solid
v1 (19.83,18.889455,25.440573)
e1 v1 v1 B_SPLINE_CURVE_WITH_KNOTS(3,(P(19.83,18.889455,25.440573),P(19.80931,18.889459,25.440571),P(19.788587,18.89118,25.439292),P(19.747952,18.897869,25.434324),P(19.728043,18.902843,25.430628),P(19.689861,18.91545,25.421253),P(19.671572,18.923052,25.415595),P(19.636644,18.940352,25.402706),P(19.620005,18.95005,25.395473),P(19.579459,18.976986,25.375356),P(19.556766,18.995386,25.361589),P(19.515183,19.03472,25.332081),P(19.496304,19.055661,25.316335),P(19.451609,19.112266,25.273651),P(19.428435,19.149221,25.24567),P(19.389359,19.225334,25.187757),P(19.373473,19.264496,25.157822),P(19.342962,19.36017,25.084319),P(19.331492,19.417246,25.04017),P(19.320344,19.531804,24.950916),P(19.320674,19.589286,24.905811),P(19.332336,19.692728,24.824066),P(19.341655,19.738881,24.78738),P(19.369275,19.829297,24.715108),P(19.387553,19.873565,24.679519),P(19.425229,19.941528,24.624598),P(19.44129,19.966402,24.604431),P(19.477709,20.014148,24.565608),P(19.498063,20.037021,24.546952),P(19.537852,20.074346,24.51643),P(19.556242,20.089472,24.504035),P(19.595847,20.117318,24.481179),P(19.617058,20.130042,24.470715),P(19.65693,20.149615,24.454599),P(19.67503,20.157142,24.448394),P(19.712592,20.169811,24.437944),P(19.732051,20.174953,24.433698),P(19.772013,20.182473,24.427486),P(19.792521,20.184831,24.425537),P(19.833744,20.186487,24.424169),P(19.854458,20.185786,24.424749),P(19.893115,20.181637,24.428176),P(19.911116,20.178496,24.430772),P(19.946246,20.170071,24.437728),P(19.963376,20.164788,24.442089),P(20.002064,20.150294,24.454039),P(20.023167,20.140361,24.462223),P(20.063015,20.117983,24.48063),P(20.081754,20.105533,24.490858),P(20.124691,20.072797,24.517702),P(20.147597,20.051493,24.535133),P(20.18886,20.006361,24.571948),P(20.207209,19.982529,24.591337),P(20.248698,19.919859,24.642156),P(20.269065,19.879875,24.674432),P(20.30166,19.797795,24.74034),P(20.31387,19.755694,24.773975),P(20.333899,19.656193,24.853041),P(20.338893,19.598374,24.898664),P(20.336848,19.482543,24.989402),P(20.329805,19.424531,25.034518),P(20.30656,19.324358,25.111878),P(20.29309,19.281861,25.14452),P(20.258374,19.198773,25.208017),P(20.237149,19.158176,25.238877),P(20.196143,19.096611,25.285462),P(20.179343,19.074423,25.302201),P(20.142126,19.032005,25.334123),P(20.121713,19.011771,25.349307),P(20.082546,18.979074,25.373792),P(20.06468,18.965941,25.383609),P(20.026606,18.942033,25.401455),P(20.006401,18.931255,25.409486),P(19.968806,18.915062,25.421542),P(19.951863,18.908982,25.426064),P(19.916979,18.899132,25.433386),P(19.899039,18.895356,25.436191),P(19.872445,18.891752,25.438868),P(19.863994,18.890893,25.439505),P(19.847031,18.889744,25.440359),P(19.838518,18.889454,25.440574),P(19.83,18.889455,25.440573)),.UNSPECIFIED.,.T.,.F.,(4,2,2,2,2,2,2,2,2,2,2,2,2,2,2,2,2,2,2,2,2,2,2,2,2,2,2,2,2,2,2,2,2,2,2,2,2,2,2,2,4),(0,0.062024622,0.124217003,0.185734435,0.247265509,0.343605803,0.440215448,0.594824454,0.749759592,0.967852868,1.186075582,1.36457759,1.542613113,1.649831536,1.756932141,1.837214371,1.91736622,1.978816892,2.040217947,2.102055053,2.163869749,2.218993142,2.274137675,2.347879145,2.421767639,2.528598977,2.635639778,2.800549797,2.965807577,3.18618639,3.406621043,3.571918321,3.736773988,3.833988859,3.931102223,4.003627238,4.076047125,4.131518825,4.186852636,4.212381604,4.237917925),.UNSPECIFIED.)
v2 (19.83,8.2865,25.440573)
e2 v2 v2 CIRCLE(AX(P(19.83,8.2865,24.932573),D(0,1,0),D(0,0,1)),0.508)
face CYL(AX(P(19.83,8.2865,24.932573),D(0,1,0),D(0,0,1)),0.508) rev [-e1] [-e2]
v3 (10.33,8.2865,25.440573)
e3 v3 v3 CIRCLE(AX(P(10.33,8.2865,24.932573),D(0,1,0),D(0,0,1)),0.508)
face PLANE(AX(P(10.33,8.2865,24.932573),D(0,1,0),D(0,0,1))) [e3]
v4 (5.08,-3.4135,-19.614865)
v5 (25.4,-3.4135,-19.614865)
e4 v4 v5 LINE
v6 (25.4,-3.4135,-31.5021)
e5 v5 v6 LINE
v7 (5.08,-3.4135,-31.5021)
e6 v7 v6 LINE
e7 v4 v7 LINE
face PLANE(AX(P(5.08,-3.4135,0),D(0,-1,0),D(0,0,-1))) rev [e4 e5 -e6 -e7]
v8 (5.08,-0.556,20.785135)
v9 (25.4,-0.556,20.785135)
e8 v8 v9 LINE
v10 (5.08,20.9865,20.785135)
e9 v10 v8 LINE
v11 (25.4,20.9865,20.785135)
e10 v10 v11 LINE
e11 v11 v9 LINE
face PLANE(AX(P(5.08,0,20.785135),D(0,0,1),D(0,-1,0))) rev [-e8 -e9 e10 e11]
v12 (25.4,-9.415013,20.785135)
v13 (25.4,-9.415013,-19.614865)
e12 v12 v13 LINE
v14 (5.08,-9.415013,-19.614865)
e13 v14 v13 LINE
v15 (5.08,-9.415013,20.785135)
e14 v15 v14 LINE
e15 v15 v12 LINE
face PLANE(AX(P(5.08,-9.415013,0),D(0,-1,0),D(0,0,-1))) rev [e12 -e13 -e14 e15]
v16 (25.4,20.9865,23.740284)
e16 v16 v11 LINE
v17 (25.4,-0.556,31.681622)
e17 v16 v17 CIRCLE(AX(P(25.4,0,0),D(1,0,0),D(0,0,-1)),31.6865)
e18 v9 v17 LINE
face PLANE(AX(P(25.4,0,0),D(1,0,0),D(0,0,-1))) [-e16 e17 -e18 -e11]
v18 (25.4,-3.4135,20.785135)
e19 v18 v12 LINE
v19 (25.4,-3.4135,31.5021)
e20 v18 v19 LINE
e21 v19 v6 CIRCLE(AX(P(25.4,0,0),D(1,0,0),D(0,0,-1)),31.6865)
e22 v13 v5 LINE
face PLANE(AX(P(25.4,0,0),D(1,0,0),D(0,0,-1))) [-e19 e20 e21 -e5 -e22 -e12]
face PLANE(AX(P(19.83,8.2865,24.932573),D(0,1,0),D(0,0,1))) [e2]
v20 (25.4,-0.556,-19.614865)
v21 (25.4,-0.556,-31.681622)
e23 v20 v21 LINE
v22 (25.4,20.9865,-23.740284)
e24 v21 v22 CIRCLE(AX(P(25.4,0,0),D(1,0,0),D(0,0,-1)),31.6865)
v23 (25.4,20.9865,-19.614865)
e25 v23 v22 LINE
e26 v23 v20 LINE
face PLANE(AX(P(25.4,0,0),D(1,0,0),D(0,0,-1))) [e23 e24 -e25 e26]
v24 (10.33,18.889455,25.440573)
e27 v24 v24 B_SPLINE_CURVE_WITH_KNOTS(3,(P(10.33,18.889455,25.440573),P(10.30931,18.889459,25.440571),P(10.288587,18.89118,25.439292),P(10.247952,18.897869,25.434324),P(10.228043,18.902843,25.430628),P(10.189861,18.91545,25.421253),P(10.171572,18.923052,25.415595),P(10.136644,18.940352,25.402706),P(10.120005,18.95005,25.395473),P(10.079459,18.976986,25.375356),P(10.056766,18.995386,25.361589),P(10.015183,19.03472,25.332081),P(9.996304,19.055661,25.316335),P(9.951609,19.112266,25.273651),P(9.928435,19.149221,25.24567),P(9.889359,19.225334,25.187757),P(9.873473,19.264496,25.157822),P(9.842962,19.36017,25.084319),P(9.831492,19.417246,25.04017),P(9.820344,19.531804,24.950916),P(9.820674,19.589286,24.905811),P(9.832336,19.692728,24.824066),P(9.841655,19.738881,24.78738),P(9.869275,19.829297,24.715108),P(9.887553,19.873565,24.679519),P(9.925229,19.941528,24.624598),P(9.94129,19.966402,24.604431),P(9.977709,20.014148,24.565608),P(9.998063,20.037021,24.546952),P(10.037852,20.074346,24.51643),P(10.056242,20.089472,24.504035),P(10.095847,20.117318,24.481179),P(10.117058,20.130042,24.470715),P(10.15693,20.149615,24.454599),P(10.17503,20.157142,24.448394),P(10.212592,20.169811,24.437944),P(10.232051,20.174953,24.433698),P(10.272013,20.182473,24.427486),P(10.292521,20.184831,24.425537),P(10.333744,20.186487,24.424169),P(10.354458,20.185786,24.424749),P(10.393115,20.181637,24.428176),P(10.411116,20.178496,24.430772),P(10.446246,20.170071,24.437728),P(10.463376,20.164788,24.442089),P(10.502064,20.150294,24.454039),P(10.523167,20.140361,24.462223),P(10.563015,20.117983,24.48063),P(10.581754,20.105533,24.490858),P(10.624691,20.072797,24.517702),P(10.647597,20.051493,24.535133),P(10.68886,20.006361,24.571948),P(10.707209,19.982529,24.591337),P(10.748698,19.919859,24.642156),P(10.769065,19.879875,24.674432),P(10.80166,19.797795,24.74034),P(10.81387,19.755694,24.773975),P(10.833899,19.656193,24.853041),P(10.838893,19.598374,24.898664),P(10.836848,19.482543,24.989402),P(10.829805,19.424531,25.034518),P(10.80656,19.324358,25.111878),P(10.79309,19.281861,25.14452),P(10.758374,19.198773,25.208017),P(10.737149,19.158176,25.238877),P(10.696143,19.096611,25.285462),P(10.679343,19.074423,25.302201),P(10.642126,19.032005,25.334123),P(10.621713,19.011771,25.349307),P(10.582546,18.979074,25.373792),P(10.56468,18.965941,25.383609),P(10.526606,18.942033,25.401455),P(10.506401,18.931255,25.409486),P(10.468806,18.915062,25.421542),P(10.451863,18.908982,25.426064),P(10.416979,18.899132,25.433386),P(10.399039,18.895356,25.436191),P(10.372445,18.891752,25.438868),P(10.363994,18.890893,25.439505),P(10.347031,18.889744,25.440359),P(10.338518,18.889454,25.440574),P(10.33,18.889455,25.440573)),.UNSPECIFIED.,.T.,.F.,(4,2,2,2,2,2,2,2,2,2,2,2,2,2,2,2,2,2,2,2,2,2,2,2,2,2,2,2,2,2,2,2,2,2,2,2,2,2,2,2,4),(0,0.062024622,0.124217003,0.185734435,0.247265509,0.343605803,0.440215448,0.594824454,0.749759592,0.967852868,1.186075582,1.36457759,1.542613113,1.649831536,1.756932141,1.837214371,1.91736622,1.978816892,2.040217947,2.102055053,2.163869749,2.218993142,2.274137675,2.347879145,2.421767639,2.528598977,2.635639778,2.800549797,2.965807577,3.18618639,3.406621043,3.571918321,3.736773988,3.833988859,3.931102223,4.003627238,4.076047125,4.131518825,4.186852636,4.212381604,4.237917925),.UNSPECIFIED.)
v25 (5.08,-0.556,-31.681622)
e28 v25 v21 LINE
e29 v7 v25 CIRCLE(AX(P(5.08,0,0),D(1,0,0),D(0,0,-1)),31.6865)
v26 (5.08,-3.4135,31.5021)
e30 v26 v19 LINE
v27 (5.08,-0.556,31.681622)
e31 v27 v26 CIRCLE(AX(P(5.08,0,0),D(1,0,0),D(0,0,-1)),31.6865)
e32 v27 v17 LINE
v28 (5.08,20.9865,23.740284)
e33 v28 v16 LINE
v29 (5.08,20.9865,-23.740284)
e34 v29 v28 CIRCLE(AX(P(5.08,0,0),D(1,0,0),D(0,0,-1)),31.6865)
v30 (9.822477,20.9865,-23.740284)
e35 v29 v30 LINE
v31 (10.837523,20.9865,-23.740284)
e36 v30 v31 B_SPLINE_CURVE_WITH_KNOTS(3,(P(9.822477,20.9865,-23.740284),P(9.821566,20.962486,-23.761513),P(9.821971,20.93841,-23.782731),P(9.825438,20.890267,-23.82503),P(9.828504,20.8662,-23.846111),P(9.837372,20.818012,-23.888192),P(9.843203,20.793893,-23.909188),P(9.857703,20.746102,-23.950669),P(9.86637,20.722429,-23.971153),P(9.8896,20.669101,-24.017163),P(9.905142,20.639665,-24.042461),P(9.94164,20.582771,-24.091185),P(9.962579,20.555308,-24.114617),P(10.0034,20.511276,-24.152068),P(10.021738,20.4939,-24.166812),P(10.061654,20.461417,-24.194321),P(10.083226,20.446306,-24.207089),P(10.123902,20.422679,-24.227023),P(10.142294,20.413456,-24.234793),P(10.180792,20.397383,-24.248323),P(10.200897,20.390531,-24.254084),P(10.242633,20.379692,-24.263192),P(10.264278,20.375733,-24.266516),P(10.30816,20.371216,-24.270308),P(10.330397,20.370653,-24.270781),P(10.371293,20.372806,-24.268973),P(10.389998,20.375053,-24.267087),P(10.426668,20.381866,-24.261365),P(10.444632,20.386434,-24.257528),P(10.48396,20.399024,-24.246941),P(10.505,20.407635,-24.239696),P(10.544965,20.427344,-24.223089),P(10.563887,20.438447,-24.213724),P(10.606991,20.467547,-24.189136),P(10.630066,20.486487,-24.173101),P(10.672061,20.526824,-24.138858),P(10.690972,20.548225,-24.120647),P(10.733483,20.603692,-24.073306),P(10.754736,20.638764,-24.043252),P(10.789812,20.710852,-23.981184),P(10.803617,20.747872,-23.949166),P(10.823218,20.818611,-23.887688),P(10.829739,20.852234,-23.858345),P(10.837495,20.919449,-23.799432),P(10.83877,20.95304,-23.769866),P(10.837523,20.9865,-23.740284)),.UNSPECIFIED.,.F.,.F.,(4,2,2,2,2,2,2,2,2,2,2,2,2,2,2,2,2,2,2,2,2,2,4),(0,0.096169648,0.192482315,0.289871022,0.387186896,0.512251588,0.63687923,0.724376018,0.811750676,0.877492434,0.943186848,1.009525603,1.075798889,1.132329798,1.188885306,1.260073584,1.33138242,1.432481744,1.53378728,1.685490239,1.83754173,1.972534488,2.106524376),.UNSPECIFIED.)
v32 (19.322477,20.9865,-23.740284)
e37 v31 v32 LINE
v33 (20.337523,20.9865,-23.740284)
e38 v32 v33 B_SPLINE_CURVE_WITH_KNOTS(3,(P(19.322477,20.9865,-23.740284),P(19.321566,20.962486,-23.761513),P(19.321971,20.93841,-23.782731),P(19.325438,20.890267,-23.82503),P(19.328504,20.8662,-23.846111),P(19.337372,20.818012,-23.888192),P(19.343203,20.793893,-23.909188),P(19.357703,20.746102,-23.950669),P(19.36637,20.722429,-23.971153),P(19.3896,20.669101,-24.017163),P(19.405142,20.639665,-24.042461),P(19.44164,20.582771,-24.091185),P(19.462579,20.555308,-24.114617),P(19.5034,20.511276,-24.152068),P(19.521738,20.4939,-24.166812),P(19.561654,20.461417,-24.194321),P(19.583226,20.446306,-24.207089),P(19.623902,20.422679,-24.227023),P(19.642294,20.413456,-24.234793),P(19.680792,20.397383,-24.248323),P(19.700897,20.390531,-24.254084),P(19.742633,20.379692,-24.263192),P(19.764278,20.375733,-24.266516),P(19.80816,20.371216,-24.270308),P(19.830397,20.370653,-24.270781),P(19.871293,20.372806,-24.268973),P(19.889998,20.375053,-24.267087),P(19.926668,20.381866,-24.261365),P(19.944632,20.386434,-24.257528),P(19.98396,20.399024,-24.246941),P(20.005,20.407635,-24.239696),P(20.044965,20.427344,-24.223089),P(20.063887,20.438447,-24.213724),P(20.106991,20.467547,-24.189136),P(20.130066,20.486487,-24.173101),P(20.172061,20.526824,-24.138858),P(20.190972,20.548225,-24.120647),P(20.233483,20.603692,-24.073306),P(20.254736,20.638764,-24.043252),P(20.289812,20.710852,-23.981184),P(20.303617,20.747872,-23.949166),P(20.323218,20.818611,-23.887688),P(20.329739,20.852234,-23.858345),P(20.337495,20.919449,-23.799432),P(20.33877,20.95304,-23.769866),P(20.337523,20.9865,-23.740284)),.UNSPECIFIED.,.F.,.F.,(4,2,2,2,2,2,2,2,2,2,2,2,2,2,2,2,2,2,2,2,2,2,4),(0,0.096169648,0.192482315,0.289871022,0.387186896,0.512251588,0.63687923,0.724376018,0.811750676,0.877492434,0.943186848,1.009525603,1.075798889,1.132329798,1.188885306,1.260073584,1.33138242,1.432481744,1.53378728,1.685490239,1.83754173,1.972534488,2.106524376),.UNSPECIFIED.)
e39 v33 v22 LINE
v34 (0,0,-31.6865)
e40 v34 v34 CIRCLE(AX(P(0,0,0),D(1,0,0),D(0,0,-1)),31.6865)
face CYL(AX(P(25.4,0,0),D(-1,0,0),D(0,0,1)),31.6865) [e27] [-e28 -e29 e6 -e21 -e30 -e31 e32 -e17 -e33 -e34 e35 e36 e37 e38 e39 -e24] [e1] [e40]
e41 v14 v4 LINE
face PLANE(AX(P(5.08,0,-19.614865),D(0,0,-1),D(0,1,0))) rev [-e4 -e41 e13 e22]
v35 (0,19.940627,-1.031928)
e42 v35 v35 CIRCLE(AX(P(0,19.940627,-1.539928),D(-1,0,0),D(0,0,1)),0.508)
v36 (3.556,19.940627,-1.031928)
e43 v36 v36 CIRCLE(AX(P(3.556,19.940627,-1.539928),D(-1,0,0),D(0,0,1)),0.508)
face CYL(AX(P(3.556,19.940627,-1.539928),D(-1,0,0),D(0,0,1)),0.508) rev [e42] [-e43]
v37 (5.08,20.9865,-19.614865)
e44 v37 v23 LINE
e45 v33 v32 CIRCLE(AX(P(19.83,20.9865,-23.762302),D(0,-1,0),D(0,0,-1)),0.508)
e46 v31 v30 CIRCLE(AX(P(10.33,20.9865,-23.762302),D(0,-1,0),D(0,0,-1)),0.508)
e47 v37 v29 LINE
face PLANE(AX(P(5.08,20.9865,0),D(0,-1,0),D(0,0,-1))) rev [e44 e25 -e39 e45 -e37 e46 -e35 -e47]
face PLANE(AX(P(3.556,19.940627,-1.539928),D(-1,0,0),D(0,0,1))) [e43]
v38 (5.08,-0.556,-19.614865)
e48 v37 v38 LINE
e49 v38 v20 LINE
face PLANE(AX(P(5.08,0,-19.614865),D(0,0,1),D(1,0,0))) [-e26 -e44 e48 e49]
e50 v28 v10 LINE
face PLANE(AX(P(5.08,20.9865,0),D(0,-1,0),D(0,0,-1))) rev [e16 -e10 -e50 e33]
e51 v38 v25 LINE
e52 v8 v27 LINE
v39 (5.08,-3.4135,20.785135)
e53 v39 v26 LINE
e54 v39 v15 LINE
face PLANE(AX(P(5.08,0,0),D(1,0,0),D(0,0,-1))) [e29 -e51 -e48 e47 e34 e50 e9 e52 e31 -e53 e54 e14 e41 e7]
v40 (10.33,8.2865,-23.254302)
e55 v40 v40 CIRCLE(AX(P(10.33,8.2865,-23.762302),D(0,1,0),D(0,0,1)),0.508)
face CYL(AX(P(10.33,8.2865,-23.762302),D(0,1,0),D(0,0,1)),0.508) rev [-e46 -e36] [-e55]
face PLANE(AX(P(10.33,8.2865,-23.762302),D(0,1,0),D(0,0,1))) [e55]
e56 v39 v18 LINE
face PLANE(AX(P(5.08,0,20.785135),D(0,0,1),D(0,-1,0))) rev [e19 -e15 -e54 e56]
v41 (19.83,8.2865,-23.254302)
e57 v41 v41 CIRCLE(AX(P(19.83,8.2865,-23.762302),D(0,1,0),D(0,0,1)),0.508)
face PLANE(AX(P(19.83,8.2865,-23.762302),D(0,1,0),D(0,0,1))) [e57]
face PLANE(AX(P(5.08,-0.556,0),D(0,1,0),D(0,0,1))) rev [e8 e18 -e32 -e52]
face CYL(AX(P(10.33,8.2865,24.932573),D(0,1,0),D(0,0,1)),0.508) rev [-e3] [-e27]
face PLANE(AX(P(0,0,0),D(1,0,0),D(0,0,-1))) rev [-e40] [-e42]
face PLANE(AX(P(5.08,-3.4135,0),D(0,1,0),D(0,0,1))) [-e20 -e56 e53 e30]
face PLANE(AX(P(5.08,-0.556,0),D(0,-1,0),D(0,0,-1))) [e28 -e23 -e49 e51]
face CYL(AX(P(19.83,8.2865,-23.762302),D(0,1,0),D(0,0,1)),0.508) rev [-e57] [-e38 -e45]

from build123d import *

# Parameters (mm, degrees)
SKETCH1_R           = 31.6865
BOSS_EXTRUDE1_DEPTH = 25.4
CUT_EXTRUDE1_START  = -20.32
CUT_EXTRUDE1_DEPTH  = 20.32
SKETCH5_R           = 0.508
CUT_EXTRUDE2_DEPTH  = 12.7
SKETCH6_R           = 0.508
CUT_EXTRUDE3_DEPTH  = 3.556


with BuildPart() as part:
    # Sketch1 → Boss-Extrude1 (new body)
    with BuildSketch(Plane(origin=(0, 0, 0), x_dir=(0, 0, -1), z_dir=(1, 0, 0))):
        Circle(SKETCH1_R)
    extrude(amount=BOSS_EXTRUDE1_DEPTH)

    # Sketch3 → Cut-Extrude1 (cut)
    with BuildSketch(Plane(origin=(25.4, 0, 0), x_dir=(0, 0, -1), z_dir=(1, 0, 0)).offset(CUT_EXTRUDE1_START)):
        with BuildLine():
            Line((-20.785135478, -0.556), (-31.681621585, -0.556))
            ThreePointArc((-31.681621585, -0.556), (-31.624152047, -1.986778691), (-31.50209993, -3.4135))
            Line((-31.50209993, -3.4135), (-20.785135478, -3.4135))
            Line((-20.785135478, -3.4135), (-20.785135478, -9.415012817))
            Line((-20.785135478, -9.415012817), (19.614864522, -9.415012817))
            Line((19.614864522, -9.415012817), (19.614864522, -3.4135))
            Line((19.614864522, -3.4135), (31.50209993, -3.4135))
            ThreePointArc((31.50209993, -3.4135), (31.624152047, -1.986778691), (31.681621585, -0.556))
            Line((31.681621585, -0.556), (19.614864522, -0.556))
            Line((19.614864522, -0.556), (19.614864522, 20.9865))
            Line((19.614864522, 20.9865), (23.740284329, 20.9865))
            ThreePointArc((23.740284329, 20.9865), (0, 31.6865), (-23.740284329, 20.9865))
            Line((-23.740284329, 20.9865), (-20.785135478, 20.9865))
            Line((-20.785135478, 20.9865), (-20.785135478, -0.556))
        make_face()
    extrude(amount=CUT_EXTRUDE1_DEPTH, mode=Mode.SUBTRACT)

    # Sketch5 → Cut-Extrude2 (cut)
    with BuildSketch(Plane(origin=(0, 20.9865, 0), x_dir=(1, 0, 0), z_dir=(0, 1, 0))):
        with Locations((10.33, -24.932573059)):
            Circle(SKETCH5_R)
        with Locations((19.83, -24.932573059)):
            Circle(SKETCH5_R)
        with Locations((10.33, 23.762302103)):
            Circle(SKETCH5_R)
        with Locations((19.83, 23.762302103)):
            Circle(SKETCH5_R)
    extrude(amount=-CUT_EXTRUDE2_DEPTH, mode=Mode.SUBTRACT)

    # Sketch6 → Cut-Extrude3 (cut)
    with BuildSketch(Plane.ZY):
        with Locations((-1.539927539, 19.940627452)):
            Circle(SKETCH6_R)
    extrude(amount=-CUT_EXTRUDE3_DEPTH, mode=Mode.SUBTRACT)


solid = part.part
